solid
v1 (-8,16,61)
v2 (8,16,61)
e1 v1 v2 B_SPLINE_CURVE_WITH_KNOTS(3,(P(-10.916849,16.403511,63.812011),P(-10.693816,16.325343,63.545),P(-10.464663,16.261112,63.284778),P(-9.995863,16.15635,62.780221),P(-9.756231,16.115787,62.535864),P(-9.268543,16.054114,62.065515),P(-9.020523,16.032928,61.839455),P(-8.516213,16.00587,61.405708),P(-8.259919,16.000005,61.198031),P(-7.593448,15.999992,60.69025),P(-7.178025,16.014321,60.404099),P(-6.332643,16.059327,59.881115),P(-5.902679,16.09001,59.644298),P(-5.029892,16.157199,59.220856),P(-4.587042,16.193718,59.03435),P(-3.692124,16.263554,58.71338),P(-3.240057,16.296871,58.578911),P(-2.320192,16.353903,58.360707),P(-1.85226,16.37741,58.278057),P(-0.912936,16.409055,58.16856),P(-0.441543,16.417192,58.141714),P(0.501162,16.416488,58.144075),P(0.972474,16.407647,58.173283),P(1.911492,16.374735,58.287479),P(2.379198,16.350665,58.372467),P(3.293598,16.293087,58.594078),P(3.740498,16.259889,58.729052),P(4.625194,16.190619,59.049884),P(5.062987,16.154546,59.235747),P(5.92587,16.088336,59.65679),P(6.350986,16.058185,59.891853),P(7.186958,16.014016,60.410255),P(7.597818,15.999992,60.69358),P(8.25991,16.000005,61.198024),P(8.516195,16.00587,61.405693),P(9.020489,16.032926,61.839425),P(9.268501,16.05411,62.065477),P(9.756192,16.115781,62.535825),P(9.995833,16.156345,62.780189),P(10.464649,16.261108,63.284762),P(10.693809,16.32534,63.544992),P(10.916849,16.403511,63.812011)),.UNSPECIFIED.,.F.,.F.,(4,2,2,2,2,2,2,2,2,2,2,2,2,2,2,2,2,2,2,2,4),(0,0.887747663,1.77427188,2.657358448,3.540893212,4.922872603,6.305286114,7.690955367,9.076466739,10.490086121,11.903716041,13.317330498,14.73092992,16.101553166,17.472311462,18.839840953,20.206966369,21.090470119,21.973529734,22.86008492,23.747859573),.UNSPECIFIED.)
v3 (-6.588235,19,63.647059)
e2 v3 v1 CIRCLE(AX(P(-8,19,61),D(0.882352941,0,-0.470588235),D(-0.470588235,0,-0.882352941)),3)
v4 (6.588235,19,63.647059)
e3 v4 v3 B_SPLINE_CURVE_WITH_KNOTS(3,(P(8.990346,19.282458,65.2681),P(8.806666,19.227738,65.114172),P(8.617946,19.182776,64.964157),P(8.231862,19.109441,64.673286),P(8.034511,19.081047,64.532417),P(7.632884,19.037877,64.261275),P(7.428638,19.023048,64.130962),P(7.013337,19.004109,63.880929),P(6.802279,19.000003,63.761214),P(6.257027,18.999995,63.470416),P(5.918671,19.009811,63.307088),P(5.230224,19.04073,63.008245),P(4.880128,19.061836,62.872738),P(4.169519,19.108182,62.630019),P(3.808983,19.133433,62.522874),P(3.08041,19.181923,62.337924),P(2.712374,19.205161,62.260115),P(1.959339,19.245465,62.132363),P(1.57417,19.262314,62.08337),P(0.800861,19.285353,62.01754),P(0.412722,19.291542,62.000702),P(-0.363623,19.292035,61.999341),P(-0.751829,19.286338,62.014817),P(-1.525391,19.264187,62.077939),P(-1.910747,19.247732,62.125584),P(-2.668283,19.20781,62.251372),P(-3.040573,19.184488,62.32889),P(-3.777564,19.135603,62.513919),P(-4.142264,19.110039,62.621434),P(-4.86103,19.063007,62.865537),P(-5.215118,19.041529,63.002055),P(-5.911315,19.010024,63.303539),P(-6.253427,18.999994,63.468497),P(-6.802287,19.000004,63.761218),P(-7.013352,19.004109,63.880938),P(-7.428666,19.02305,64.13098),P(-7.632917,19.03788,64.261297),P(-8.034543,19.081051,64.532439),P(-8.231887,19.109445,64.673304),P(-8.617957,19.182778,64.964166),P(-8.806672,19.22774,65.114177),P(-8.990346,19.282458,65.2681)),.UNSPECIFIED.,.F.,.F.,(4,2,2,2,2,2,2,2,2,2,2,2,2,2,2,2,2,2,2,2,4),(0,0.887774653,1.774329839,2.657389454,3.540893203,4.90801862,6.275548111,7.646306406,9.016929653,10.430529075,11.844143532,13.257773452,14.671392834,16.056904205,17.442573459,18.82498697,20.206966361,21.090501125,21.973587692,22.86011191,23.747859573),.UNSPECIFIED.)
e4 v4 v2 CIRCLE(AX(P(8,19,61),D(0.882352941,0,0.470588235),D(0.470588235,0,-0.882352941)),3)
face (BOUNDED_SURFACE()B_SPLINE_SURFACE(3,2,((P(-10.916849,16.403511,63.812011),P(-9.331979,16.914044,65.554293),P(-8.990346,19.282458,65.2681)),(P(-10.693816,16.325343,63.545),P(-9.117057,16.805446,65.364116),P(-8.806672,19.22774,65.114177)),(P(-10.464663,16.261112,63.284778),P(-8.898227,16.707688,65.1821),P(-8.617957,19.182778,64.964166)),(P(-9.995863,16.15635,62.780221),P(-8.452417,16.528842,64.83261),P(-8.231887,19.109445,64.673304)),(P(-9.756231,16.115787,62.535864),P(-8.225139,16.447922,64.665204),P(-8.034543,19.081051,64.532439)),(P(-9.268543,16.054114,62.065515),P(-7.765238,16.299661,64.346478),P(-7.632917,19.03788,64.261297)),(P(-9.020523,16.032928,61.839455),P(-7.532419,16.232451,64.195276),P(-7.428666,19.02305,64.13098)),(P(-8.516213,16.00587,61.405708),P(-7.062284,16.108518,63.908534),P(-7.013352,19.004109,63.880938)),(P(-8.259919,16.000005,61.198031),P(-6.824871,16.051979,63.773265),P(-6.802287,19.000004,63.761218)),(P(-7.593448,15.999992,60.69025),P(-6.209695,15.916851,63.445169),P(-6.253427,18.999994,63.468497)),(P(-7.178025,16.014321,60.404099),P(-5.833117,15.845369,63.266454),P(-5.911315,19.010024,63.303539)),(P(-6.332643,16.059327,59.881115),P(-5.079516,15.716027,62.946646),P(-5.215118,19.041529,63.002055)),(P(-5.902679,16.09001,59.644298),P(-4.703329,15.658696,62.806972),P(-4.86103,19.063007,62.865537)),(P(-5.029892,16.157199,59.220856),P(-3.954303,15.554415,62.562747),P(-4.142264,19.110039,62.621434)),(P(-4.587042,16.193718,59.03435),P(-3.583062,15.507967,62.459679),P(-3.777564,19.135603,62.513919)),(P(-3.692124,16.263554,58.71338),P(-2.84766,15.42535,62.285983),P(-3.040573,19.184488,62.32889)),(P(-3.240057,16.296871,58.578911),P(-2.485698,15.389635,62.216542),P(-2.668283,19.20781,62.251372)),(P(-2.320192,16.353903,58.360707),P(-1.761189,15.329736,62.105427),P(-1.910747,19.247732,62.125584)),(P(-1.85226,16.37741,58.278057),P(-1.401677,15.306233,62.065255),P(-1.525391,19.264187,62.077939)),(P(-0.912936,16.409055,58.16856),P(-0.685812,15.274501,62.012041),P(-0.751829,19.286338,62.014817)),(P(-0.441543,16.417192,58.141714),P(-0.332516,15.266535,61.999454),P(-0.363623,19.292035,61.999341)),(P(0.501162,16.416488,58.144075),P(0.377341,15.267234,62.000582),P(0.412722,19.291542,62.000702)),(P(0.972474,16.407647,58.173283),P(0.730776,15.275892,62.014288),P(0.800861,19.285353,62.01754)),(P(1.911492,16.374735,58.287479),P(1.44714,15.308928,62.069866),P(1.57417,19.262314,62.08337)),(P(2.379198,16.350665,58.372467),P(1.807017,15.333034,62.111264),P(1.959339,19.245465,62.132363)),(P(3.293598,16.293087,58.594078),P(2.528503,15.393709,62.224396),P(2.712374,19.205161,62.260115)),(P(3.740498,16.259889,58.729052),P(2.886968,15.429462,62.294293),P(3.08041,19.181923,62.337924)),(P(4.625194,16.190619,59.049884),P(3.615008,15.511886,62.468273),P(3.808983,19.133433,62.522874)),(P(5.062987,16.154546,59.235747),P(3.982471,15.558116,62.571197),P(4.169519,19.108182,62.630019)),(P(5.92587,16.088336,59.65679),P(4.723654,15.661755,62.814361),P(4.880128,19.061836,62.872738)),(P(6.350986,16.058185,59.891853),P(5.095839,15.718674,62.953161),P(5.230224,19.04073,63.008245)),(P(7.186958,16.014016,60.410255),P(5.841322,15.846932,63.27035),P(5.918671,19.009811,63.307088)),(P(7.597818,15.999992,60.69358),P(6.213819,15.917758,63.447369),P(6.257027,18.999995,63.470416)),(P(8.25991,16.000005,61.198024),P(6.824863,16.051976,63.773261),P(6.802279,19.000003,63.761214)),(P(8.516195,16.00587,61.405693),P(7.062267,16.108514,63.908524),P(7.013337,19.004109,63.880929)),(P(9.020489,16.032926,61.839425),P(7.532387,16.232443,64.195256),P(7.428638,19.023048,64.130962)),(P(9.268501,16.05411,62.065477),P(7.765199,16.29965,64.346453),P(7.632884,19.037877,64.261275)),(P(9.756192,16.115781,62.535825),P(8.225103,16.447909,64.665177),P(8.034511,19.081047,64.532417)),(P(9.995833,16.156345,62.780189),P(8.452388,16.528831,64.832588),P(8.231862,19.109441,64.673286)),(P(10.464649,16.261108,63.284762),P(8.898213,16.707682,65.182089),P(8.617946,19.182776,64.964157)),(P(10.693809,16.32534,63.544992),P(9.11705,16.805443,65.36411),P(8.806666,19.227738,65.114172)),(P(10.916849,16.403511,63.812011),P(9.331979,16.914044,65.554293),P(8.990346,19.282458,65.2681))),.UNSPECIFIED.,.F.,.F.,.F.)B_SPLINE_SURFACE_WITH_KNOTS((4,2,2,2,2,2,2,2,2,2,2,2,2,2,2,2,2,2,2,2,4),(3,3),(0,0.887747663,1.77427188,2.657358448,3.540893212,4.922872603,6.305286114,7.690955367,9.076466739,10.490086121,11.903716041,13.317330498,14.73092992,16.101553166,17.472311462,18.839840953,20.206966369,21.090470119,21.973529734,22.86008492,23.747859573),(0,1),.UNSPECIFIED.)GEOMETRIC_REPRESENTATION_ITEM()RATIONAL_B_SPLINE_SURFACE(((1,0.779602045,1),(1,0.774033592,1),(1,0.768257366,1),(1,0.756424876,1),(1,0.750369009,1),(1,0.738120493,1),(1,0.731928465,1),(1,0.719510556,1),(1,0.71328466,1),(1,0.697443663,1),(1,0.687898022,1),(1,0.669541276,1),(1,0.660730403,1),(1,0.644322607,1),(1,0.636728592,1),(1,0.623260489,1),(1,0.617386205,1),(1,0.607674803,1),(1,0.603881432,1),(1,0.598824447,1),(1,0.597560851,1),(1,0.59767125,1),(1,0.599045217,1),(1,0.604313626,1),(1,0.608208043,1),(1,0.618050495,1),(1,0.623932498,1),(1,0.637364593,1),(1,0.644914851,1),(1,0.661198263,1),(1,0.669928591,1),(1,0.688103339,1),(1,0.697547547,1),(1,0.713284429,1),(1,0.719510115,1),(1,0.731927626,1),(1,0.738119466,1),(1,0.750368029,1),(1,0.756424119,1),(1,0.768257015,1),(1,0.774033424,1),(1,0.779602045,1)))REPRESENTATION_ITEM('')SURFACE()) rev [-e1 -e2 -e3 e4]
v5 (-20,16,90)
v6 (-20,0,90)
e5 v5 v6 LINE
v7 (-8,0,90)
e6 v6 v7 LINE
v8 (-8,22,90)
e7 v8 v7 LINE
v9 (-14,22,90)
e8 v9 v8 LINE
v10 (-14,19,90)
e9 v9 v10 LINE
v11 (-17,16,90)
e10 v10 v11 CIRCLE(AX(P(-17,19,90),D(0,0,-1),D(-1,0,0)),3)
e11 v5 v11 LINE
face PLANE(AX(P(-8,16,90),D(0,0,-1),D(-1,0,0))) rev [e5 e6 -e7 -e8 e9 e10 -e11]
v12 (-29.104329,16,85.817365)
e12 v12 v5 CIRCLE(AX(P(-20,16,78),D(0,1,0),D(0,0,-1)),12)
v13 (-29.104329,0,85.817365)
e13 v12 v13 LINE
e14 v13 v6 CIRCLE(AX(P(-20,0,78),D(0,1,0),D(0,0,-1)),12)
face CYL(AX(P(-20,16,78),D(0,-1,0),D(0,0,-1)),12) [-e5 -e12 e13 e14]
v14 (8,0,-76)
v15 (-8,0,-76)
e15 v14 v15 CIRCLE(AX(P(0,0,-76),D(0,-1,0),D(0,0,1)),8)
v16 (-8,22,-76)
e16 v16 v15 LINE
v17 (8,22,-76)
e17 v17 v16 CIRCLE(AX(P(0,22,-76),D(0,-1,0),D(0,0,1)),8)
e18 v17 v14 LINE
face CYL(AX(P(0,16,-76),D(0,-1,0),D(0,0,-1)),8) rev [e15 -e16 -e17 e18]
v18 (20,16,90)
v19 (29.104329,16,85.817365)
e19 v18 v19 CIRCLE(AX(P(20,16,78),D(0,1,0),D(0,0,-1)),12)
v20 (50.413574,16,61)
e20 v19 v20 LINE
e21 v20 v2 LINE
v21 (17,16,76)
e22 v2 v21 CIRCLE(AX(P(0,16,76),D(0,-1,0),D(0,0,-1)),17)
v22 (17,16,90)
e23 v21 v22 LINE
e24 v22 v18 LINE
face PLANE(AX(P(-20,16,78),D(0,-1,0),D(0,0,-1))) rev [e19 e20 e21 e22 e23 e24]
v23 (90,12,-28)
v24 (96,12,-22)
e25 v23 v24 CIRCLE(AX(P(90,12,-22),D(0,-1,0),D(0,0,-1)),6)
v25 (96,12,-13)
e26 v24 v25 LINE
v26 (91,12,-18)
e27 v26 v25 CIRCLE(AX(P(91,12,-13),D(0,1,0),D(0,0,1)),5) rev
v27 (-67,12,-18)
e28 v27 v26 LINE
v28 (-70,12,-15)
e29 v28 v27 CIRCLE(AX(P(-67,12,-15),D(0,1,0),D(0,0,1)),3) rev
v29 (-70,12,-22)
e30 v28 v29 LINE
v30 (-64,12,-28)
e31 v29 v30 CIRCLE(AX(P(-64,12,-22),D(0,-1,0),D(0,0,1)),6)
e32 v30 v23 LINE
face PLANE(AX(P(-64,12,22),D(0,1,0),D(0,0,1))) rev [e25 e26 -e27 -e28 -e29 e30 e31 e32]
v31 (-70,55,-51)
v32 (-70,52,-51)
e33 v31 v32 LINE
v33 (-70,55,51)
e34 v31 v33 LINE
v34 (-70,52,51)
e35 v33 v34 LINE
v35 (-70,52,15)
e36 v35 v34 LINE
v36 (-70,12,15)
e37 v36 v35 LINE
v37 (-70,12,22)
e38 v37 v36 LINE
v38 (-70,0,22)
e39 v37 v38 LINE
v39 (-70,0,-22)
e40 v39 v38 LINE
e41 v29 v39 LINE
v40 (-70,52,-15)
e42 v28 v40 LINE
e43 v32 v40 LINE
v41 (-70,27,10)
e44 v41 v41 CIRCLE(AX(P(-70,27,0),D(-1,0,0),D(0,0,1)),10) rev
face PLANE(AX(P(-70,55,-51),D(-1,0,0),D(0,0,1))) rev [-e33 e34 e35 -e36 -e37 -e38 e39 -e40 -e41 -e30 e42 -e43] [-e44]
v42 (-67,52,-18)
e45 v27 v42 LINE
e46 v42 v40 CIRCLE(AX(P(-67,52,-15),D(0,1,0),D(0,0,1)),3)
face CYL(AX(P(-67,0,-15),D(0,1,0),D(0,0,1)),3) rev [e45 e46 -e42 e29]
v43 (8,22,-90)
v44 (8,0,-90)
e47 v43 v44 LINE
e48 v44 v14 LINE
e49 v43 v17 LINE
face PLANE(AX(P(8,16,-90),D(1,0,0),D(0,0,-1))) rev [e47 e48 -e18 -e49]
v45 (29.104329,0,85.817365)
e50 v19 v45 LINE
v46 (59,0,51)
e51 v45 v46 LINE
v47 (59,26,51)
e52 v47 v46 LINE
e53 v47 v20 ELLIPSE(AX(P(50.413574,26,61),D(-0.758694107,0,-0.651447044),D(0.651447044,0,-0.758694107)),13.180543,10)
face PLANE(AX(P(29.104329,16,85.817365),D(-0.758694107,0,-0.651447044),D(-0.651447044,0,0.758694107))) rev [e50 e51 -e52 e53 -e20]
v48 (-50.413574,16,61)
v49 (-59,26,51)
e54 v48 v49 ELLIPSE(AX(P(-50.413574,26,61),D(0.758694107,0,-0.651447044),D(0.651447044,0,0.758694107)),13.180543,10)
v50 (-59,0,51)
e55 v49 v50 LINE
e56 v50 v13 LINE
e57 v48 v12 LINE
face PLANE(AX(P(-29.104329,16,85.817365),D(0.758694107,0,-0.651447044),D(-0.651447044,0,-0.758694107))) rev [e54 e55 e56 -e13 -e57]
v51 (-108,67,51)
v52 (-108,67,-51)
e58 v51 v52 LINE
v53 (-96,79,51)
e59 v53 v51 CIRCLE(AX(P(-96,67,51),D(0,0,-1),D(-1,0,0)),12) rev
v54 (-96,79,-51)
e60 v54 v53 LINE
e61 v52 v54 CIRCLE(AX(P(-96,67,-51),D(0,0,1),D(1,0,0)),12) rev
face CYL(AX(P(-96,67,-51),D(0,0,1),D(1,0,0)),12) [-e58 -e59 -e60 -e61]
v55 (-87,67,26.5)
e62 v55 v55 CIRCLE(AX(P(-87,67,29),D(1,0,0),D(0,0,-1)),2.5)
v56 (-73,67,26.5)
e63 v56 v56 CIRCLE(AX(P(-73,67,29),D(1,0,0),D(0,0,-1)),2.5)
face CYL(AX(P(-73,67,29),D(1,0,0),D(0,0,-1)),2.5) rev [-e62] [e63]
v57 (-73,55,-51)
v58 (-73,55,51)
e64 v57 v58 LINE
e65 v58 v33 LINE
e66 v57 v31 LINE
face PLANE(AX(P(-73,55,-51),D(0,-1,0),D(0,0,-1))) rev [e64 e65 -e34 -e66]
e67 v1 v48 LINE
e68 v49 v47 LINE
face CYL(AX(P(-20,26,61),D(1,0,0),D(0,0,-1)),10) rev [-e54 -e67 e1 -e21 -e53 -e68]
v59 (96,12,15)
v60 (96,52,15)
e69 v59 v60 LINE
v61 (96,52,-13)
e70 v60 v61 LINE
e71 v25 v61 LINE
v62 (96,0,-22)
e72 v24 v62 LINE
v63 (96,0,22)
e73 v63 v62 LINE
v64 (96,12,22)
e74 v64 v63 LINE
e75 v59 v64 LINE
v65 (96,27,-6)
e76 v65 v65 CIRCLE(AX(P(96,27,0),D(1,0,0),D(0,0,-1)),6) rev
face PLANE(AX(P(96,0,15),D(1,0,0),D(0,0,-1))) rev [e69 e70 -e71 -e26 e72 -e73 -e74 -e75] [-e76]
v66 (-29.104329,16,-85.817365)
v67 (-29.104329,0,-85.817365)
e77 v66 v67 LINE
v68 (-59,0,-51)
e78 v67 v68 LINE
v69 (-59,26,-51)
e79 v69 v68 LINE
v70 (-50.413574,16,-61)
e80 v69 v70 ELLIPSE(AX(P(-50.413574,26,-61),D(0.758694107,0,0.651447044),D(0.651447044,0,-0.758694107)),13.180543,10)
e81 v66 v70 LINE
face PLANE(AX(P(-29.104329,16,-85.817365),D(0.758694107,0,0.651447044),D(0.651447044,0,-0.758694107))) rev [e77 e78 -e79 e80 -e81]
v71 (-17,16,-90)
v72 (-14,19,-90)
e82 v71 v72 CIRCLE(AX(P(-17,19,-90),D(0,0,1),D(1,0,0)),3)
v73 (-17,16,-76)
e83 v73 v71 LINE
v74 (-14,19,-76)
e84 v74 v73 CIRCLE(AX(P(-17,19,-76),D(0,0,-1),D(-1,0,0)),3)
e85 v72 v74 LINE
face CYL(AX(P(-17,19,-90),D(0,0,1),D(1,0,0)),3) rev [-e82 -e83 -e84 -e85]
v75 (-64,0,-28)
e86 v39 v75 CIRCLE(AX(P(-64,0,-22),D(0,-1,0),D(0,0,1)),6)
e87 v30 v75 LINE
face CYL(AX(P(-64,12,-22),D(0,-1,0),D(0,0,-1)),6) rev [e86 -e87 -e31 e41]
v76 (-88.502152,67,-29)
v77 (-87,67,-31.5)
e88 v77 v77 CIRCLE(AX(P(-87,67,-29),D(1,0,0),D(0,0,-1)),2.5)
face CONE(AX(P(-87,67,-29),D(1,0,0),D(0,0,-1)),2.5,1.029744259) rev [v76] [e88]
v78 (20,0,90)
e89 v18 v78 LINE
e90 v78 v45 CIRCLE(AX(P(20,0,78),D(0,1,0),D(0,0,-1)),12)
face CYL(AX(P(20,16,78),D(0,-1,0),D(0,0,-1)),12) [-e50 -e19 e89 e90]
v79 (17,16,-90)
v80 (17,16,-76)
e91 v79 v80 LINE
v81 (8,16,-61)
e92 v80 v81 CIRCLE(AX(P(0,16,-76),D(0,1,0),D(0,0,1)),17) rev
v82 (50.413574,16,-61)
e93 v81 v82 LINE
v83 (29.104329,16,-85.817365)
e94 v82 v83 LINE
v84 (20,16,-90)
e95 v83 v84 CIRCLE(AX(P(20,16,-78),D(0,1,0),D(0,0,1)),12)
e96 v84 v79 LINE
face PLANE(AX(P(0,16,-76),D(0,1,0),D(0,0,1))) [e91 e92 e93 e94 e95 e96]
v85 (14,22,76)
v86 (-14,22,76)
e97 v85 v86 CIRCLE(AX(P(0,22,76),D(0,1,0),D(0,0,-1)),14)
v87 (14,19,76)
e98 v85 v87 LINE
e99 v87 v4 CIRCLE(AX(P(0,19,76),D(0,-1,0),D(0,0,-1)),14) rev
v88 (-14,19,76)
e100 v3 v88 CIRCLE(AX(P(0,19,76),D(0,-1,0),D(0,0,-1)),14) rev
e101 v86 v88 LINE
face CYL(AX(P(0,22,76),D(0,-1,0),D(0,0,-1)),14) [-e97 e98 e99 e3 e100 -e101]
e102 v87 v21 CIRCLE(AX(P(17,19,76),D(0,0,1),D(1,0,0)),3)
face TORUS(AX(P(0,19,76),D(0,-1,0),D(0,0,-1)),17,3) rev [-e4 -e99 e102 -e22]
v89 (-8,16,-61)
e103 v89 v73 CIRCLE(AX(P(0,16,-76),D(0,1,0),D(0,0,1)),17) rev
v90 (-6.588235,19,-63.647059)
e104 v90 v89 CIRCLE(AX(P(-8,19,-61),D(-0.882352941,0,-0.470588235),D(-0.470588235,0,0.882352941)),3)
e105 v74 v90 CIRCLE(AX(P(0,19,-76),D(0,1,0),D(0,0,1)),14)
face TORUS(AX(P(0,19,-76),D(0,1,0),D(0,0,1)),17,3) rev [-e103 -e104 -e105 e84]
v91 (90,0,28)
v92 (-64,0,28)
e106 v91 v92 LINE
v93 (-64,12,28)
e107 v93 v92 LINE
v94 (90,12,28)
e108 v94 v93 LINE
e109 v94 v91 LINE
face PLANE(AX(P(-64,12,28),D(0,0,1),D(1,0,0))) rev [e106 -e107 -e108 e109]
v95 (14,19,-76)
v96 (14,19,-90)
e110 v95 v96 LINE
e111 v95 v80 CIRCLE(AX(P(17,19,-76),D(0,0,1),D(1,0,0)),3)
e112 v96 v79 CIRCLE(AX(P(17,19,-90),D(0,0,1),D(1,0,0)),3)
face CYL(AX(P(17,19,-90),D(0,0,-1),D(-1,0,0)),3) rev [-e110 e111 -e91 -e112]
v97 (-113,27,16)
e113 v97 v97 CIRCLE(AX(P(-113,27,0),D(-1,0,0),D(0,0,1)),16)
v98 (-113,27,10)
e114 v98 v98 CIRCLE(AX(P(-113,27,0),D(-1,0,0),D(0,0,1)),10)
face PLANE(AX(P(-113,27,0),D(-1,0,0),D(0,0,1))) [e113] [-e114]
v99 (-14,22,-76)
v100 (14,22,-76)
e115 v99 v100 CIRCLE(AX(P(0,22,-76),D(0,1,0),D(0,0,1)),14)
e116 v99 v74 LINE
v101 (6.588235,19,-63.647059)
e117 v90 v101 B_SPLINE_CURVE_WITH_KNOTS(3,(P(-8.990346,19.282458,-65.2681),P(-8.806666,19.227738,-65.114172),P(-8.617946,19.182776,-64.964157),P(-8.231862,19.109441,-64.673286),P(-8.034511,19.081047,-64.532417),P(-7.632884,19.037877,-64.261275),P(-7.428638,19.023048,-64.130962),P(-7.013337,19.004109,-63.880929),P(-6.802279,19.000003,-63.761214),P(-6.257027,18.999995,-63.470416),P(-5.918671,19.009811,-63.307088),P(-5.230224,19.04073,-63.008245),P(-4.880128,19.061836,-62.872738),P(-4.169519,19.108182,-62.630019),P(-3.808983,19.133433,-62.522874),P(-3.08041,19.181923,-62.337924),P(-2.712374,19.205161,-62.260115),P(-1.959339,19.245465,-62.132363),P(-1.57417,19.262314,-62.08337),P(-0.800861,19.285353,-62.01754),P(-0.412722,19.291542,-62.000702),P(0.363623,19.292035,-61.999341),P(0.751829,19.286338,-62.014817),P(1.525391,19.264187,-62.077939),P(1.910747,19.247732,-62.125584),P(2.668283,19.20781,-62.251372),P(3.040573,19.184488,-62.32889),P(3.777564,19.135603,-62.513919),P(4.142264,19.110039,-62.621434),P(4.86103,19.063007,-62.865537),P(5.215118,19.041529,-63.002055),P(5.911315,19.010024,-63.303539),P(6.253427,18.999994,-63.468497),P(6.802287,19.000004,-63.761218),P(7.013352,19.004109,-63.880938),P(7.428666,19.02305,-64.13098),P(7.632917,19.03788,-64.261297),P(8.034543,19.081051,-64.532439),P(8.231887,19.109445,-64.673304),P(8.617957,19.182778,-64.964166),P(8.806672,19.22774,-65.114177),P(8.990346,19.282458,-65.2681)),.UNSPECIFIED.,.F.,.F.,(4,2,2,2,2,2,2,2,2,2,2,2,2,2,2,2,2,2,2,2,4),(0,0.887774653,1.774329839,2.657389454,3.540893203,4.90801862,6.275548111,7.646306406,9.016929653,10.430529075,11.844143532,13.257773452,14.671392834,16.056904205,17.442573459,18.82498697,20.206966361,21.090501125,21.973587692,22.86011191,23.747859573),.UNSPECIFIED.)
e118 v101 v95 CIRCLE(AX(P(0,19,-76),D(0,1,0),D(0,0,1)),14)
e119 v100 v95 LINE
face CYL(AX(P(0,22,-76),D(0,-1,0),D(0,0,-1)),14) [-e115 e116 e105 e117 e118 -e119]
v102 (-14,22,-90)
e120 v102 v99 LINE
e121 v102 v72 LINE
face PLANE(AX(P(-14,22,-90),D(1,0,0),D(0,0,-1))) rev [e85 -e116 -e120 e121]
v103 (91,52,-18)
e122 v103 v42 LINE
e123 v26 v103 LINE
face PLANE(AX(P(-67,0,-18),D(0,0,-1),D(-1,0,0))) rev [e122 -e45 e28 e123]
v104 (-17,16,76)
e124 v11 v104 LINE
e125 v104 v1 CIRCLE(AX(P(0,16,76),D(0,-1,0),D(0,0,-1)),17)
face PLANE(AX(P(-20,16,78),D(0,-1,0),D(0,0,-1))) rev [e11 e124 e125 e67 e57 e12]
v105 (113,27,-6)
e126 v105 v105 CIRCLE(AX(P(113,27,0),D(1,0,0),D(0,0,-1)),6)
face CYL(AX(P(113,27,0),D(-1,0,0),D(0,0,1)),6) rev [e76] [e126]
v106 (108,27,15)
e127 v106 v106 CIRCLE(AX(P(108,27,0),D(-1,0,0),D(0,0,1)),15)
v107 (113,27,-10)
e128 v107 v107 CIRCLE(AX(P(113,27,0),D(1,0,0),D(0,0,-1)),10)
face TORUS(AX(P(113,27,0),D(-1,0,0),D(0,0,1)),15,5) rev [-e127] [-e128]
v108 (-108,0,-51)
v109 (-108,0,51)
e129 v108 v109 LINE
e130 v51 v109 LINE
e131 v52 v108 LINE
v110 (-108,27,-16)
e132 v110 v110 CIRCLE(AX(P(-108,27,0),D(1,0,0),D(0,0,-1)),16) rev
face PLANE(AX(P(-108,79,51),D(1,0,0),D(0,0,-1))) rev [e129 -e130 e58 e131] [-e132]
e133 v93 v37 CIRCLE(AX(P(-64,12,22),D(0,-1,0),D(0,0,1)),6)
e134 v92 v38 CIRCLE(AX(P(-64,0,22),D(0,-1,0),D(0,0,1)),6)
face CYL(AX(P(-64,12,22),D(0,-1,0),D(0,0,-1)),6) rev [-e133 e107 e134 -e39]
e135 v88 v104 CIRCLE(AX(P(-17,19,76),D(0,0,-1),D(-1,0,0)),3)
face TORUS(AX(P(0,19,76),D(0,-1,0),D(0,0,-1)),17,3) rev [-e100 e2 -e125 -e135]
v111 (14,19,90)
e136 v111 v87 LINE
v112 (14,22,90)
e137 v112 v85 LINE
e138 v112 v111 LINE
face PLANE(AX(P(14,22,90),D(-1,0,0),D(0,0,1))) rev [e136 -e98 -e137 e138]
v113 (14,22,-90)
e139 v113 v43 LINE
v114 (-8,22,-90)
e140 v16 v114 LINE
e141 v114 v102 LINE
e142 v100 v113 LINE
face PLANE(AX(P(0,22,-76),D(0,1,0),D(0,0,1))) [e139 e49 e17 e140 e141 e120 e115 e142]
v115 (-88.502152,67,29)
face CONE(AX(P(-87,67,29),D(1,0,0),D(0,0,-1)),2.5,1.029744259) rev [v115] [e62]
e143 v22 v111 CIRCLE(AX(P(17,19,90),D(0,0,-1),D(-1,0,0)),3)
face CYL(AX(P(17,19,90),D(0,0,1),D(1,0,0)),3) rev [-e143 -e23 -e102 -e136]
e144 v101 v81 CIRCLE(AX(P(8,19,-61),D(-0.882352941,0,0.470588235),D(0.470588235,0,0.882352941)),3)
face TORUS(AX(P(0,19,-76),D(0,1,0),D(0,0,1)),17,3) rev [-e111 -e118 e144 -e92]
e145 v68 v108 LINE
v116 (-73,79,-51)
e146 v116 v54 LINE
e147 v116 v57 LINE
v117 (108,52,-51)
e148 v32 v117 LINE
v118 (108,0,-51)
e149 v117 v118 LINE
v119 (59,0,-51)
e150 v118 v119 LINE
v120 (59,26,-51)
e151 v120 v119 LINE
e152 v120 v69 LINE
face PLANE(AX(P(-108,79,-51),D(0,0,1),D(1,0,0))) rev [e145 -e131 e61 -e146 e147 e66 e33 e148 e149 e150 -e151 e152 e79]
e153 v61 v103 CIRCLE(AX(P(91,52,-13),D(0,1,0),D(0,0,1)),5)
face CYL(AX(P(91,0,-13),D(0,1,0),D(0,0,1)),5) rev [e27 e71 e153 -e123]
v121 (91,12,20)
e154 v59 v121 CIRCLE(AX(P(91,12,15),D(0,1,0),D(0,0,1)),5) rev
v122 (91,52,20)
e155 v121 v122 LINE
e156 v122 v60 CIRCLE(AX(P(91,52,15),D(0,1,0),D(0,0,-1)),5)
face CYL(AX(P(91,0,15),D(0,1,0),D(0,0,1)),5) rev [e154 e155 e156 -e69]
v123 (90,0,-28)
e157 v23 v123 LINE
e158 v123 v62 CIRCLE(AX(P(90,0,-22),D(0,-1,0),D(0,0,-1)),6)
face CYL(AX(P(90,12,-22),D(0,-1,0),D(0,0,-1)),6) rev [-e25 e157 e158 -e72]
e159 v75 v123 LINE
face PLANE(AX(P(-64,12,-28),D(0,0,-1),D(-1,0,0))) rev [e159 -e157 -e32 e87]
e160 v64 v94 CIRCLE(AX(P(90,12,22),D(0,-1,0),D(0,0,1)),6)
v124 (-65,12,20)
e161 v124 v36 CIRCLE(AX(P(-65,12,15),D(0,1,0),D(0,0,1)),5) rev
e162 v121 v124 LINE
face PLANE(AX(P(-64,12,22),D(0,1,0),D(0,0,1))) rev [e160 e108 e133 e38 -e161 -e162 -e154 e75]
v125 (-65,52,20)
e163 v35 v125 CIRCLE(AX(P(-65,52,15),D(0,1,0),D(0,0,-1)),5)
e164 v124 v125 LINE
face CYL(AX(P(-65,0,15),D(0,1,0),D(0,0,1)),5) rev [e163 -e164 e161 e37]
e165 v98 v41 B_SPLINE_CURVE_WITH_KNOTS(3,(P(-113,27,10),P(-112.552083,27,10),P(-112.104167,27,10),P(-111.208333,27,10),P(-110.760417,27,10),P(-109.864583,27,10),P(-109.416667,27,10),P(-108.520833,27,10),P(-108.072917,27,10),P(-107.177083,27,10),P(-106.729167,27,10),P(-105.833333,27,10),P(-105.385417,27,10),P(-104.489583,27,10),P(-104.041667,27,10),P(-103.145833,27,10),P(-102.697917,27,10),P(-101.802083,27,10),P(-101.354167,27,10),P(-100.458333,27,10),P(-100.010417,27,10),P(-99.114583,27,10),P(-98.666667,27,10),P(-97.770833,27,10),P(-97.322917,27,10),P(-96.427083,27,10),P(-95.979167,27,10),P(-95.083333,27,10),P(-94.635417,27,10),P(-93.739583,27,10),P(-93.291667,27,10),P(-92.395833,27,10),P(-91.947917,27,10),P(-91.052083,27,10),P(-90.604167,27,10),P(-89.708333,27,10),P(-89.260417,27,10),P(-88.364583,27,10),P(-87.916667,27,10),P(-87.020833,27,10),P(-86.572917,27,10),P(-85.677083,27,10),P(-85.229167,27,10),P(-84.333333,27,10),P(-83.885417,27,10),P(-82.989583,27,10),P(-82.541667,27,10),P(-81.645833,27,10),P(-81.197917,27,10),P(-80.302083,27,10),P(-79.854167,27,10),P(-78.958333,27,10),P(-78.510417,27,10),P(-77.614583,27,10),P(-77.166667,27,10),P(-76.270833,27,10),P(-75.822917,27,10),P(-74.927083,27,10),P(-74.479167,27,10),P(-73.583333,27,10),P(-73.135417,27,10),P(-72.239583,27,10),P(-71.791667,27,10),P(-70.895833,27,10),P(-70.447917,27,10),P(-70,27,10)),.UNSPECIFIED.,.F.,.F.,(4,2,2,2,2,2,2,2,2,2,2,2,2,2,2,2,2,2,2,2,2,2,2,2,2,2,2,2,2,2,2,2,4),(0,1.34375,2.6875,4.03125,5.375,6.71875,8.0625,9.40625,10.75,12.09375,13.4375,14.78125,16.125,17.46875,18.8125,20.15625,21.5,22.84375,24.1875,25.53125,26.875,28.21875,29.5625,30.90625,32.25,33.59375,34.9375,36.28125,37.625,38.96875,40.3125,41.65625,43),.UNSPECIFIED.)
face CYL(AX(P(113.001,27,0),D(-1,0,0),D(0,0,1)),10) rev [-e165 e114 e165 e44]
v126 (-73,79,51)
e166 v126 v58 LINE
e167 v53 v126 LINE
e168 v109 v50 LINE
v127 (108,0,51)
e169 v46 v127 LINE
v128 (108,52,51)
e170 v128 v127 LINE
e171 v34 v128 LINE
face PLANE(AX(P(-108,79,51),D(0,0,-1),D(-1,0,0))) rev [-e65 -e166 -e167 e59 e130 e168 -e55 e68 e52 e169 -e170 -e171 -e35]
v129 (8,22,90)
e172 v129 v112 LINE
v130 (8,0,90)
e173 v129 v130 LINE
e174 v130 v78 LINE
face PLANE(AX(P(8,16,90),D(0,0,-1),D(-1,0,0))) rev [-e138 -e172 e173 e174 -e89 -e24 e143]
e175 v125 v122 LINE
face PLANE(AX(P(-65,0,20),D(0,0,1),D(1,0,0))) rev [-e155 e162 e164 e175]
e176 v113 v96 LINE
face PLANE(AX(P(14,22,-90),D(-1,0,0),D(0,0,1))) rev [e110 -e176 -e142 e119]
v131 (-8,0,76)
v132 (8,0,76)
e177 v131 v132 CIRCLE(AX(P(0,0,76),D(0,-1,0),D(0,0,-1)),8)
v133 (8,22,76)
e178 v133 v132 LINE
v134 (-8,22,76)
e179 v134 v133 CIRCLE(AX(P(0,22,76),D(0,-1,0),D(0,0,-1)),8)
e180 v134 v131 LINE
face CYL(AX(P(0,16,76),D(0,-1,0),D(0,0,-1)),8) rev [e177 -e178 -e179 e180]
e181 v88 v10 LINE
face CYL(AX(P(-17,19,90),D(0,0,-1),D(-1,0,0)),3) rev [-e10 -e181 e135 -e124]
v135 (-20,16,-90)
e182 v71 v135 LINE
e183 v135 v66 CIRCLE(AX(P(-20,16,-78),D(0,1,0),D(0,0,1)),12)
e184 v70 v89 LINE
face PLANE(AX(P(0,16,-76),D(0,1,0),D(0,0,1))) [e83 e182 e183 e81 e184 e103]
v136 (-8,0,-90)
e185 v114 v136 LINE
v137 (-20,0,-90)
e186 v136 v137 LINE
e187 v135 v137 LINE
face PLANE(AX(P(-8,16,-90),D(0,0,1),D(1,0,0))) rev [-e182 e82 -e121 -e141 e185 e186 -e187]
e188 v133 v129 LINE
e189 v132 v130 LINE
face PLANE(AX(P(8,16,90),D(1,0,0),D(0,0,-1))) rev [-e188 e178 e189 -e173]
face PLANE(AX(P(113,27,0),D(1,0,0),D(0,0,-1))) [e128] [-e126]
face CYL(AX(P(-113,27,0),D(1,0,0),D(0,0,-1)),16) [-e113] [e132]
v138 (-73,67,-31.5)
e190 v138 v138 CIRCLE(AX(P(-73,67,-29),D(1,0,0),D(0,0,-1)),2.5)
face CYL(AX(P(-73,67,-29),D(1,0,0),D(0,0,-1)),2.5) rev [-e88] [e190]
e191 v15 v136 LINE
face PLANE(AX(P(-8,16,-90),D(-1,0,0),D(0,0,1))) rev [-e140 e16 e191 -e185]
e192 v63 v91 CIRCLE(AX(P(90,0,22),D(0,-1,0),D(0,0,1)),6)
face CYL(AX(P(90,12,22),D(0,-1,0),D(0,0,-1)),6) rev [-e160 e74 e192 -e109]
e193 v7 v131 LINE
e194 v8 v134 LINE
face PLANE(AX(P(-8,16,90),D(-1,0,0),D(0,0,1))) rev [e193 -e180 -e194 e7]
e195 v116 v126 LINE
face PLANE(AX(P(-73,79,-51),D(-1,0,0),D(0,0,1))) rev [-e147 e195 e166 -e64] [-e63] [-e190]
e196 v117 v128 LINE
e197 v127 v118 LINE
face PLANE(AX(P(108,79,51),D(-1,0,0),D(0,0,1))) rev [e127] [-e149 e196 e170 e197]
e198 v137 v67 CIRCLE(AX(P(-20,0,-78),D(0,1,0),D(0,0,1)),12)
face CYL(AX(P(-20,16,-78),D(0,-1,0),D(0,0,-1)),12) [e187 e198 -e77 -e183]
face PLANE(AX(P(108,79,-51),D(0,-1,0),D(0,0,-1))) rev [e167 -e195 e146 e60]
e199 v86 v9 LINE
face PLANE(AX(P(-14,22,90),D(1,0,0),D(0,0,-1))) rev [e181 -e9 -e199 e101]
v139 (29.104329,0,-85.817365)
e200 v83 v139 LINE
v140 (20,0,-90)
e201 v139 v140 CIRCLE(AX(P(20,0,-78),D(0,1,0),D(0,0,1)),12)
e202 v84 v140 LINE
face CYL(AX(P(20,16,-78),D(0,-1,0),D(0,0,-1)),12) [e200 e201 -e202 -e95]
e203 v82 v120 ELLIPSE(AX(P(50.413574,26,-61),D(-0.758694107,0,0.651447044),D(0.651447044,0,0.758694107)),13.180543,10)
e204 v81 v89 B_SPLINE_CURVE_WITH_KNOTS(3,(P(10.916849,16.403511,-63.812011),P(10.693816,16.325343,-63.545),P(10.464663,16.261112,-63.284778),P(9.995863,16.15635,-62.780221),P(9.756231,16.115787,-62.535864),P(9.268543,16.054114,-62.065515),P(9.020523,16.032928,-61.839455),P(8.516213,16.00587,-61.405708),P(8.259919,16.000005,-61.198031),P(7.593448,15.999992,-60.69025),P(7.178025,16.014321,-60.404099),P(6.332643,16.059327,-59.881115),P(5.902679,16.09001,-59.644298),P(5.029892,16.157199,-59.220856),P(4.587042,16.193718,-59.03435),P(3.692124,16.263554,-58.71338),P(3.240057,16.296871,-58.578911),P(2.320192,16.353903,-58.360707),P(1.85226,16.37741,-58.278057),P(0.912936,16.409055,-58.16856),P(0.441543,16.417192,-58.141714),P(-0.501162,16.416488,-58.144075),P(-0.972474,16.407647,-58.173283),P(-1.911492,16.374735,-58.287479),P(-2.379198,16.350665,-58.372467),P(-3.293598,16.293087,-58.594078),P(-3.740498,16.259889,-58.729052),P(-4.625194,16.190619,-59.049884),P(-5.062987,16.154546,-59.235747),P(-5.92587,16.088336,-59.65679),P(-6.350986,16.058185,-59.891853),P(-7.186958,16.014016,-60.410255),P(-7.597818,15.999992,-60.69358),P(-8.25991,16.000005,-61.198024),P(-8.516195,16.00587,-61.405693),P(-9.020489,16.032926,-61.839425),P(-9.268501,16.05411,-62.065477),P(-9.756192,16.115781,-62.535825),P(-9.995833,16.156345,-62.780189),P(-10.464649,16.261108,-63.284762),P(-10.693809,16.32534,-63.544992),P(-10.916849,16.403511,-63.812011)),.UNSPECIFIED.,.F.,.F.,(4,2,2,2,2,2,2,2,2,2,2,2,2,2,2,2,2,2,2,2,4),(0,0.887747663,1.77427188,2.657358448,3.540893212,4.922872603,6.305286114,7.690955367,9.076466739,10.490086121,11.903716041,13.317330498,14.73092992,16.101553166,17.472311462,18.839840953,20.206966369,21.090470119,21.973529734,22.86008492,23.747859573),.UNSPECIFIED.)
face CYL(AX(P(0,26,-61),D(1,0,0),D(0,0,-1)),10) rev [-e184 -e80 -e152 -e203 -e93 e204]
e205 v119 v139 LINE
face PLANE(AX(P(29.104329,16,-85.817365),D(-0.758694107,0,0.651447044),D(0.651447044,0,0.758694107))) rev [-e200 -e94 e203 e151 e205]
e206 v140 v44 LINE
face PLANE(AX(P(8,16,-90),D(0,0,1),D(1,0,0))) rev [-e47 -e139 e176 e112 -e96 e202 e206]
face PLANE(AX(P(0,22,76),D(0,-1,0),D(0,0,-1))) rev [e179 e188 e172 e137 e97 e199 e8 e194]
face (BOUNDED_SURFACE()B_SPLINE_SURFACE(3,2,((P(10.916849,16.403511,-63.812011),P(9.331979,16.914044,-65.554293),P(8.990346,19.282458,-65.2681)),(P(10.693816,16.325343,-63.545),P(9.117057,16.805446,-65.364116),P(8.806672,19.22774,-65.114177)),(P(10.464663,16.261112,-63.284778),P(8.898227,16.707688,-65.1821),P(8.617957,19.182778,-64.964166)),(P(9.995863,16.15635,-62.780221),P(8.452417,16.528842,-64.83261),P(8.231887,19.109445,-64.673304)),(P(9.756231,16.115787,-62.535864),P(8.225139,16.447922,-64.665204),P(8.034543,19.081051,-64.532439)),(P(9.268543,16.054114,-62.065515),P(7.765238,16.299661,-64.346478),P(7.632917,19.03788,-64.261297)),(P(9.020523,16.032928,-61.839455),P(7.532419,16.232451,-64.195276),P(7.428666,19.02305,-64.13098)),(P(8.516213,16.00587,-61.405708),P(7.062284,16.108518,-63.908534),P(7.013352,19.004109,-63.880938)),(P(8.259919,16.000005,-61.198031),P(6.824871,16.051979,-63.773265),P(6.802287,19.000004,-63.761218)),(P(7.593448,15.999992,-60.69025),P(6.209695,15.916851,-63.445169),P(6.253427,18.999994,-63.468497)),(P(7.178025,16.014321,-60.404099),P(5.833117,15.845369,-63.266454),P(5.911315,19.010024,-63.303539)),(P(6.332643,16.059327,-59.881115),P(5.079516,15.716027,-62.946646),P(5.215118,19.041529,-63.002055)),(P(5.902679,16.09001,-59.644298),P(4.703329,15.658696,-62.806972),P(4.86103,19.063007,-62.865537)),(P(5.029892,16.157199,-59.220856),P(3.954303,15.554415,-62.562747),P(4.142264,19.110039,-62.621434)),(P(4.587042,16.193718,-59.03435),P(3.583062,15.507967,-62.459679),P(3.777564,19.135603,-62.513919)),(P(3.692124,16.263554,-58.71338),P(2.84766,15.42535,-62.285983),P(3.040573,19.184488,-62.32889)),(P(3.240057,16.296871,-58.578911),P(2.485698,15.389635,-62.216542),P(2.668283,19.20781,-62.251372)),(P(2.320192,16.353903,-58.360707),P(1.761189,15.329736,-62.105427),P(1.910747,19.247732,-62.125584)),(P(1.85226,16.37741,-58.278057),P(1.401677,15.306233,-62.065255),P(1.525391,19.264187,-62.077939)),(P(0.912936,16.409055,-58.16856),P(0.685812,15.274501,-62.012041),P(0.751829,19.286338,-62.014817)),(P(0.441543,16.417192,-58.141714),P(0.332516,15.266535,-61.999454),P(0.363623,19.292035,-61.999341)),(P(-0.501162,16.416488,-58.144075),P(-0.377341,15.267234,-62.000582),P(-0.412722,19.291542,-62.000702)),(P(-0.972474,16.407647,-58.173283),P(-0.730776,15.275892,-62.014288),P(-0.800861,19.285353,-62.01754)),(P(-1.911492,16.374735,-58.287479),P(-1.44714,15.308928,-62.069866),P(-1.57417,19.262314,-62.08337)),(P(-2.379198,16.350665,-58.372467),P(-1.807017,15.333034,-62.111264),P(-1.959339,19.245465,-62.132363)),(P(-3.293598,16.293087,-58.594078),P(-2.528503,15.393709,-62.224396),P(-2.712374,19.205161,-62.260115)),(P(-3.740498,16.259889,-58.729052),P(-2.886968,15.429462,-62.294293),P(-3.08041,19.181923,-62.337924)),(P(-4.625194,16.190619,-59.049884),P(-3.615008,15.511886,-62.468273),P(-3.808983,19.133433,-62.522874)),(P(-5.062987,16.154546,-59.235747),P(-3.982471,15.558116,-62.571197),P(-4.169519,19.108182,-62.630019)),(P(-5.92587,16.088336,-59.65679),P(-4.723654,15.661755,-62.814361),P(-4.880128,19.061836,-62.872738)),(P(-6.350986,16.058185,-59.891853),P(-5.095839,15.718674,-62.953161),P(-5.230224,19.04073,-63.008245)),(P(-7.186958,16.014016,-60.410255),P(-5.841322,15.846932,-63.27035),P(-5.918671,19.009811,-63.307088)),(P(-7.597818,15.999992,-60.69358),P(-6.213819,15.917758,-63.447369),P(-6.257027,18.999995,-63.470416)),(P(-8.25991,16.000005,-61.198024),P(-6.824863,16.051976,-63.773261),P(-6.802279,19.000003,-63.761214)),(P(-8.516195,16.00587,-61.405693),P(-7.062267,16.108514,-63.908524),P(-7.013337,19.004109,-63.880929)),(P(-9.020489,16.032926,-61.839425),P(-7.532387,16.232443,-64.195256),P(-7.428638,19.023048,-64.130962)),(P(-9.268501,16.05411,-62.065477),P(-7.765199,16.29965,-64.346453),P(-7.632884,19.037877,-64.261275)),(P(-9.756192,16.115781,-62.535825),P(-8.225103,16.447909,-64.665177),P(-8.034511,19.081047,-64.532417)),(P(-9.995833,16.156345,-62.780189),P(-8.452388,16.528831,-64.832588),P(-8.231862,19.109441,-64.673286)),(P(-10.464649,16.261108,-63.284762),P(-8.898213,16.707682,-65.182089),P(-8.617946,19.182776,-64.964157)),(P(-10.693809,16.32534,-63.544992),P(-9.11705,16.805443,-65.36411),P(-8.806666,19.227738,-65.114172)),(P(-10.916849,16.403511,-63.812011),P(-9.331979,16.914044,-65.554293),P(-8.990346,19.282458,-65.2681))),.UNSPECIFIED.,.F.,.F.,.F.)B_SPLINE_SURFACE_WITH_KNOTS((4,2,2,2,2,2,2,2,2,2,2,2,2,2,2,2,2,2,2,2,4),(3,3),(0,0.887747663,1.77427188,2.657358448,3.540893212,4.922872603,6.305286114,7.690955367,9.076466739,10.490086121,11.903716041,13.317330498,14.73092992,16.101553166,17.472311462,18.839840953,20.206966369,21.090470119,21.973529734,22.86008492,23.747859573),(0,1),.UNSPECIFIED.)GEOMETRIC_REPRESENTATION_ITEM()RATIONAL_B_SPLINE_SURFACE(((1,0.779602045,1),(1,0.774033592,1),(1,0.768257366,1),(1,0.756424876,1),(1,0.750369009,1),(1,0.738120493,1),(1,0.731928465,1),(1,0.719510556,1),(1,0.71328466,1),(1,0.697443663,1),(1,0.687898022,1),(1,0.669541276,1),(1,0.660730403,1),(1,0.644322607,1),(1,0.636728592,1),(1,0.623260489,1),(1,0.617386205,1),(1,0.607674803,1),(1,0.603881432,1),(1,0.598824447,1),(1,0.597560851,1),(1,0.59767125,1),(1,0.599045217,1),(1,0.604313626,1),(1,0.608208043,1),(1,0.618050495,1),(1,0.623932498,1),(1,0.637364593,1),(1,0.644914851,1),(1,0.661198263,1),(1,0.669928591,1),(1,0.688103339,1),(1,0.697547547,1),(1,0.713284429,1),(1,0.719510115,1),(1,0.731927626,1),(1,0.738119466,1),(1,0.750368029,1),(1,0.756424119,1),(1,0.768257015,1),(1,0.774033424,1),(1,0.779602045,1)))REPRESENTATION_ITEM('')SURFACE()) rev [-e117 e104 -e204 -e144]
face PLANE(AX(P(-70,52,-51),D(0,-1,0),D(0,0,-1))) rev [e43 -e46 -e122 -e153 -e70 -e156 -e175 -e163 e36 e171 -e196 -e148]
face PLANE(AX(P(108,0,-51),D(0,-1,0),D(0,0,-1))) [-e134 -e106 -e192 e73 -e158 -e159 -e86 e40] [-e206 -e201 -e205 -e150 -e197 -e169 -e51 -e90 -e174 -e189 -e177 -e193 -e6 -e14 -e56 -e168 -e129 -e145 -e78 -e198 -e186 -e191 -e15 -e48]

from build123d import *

# Parameters (mm, degrees)
SKETCH1_W             = 216
SKETCH1_H             = 102
EXTRUDE1_DEPTH        = 79
EXTRUDE2_DEPTH        = 169.25278601
FILLET1_R             = 12
EXTRUDE3_DEPTH        = 131.265114286
EXTRUDE4_DEPTH        = 16
EXTRUDE5_DEPTH        = 6
FILLET3_R             = 10
FILLET4_R             = 3
FILLET5_R             = 10
FILLET6_R             = 3
M6_TAPPED_HOLE1_D     = 5
M6_TAPPED_HOLE1_DEPTH = 14
M6_TAPPED_HOLE1_TIP   = 1.502151548
SKETCH13_R            = 10
SKETCH13_R_2          = 6
EXTRUDE7_DEPTH        = 5
EXTRUDE8_REACH        = 248.976
SKETCH14_R            = 6
FILLET7_R             = 5
SKETCH15_R            = 16
EXTRUDE9_DEPTH        = 5
EXTRUDE10_REACH       = 257.767
SKETCH16_R            = 10
EXTRUDE11_DEPTH       = 12


with BuildPart() as part:
    # Sketch1 → Extrude1 (new body)
    with BuildSketch(Plane(origin=(0, 0, 0), x_dir=(1, 0, 0), z_dir=(0, 1, 0))):
        Rectangle(SKETCH1_W, SKETCH1_H)
    extrude(amount=EXTRUDE1_DEPTH)

    # Sketch2 → Extrude2 (cut, through all)
    with BuildSketch(Plane.XY.offset(51)):
        Polygon((-73, 79), (-73, 55), (-70, 55), (-70, 52), (108, 52), (108, 79), align=None)
    extrude(amount=-EXTRUDE2_DEPTH, mode=Mode.SUBTRACT)

    # Fillet1
    fillet1_edges = [part.edges().sort_by_distance(p)[0] for p in [
        (-108, 79, 0),
    ]]
    fillet(fillet1_edges, radius=FILLET1_R)

    # Sketch3 → Extrude3 (cut, through all)
    with BuildSketch(Plane(origin=(0, 52, 0), x_dir=(1, 0, 0), z_dir=(0, 1, 0))):
        with BuildLine():
            Line((-65, -20), (91, -20))
            ThreePointArc((91, -20), (94.535533906, -18.535533906), (96, -15))
            Line((96, -15), (96, 13))
            ThreePointArc((96, 13), (94.535533906, 16.535533906), (91, 18))
            Line((91, 18), (-67, 18))
            ThreePointArc((-67, 18), (-69.121320344, 17.121320344), (-70, 15))
            Line((-70, 15), (-70, -15))
            ThreePointArc((-70, -15), (-68.535533906, -18.535533906), (-65, -20))
        make_face()
    extrude(amount=-EXTRUDE3_DEPTH, mode=Mode.SUBTRACT)

    # Sketch4 → Extrude4 (add)
    with BuildSketch(Plane(origin=(0, 0, 0), x_dir=(1, 0, 0), z_dir=(0, 1, 0))):
        with BuildLine():
            Line((-8, 90), (-20, 90))
            ThreePointArc((-20, 90), (-25.00957212, 88.904319657), (-29.10432929, 85.817364529))
            Line((-29.10432929, 85.817364529), (-59, 51))
            Line((-59, 51), (59, 51))
            Line((59, 51), (29.10432929, 85.817364529))
            ThreePointArc((29.10432929, 85.817364529), (25.00957212, 88.904319657), (20, 90))
            Line((20, 90), (8, 90))
            Line((8, 90), (8, 76))
            ThreePointArc((8, 76), (0, 68), (-8, 76))
            Line((-8, 76), (-8, 90))
        make_face()
        with BuildLine():
            Line((8, -90), (8, -76))
            ThreePointArc((8, -76), (0, -68), (-8, -76))
            Line((-8, -76), (-8, -90))
            Line((-8, -90), (-20, -90))
            ThreePointArc((-20, -90), (-25.00957212, -88.904319657), (-29.10432929, -85.817364529))
            Line((-29.10432929, -85.817364529), (-59, -51))
            Line((-59, -51), (59, -51))
            Line((59, -51), (29.10432929, -85.817364529))
            ThreePointArc((29.10432929, -85.817364529), (25.00957212, -88.904319657), (20, -90))
            Line((20, -90), (8, -90))
        make_face()
    extrude(amount=EXTRUDE4_DEPTH)

    # Sketch5 → Extrude5 (add)
    with BuildSketch(Plane(origin=(0, 16, 0), x_dir=(1, 0, 0), z_dir=(0, 1, 0))):
        with BuildLine():
            Line((-14, -90), (-14, -76))
            ThreePointArc((-14, -76), (0, -62), (14, -76))
            Line((14, -76), (14, -90))
            Line((14, -90), (8, -90))
            Line((8, -90), (8, -76))
            ThreePointArc((8, -76), (0, -68), (-8, -76))
            Line((-8, -76), (-8, -90))
            Line((-8, -90), (-14, -90))
        make_face()
        with BuildLine():
            Line((14, 90), (14, 76))
            ThreePointArc((14, 76), (0, 62), (-14, 76))
            Line((-14, 76), (-14, 90))
            Line((-14, 90), (-8, 90))
            Line((-8, 90), (-8, 76))
            ThreePointArc((-8, 76), (0, 68), (8, 76))
            Line((8, 76), (8, 90))
            Line((8, 90), (14, 90))
        make_face()
    extrude(amount=EXTRUDE5_DEPTH)

    # Fillet3
    fillet3_edges = [part.edges().sort_by_distance(p)[0] for p in [
        (0, 16, 51),
    ]]
    fillet(fillet3_edges, radius=FILLET3_R)

    # Fillet4
    fillet4_edges = [part.edges().sort_by_distance(p)[0] for p in [
        (14, 16, 83),
        (0, 16, 62),
        (-14, 16, 83),
    ]]
    fillet(fillet4_edges, radius=FILLET4_R)

    # Fillet5
    fillet5_edges = [part.edges().sort_by_distance(p)[0] for p in [
        (0, 16, -51),
    ]]
    fillet(fillet5_edges, radius=FILLET5_R)

    # Fillet6
    fillet6_edges = [part.edges().sort_by_distance(p)[0] for p in [
        (0, 16, -62),
        (14, 16, -83),
        (-14, 16, -83),
    ]]
    fillet(fillet6_edges, radius=FILLET6_R)

    # M6 Tapped Hole1
    with Locations(Plane(origin=(-73, 67, 29), x_dir=(0, 0, 1), z_dir=(1, 0, 0))):
        with Locations((0, 0), (-58, 0)):
            Hole(M6_TAPPED_HOLE1_D / 2, depth=M6_TAPPED_HOLE1_DEPTH)
            with Locations((0, 0, -(M6_TAPPED_HOLE1_DEPTH + M6_TAPPED_HOLE1_TIP / 2))):  # 118° drill point
                Cone(0, M6_TAPPED_HOLE1_D / 2, M6_TAPPED_HOLE1_TIP, mode=Mode.SUBTRACT)

    # Sketch13 → Extrude7 (add)
    with BuildSketch(Plane(origin=(108, 0, 0), x_dir=(0, 0, -1), z_dir=(1, 0, 0))):
        with Locations(Location((0, 27, 0), (0, 0, 180))):
            Circle(SKETCH13_R)
        with Locations((0, 27)):
            Circle(SKETCH13_R_2, mode=Mode.SUBTRACT)
    extrude(amount=EXTRUDE7_DEPTH)

    # Sketch14 → Extrude8 (cut, up to next)
    with BuildSketch(Plane(origin=(108, 0, 0), x_dir=(0, 0, -1), z_dir=(1, 0, 0)), mode=Mode.PRIVATE) as extrude8_sk1:
        with Locations((0, 27)):
            Circle(SKETCH14_R)
    extrude8_tool1 = extrude(extrude8_sk1.sketch, amount=-EXTRUDE8_REACH, mode=Mode.PRIVATE) & part.part
    add(extrude8_tool1.solids().sort_by_distance((108, 27, 0))[0], mode=Mode.SUBTRACT)

    # Fillet7
    fillet7_edges = [part.edges().sort_by_distance(p)[0] for p in [
        (108, 27, -10),
    ]]
    fillet(fillet7_edges, radius=FILLET7_R - 0.0001)  # a hair under: the kernel refuses the full size

    # Sketch15 → Extrude9 (add)
    with BuildSketch(Plane.ZY.offset(108)):
        with Locations(Location((0, 27, 0), (0, 0, 180))):
            Circle(SKETCH15_R)
    extrude(amount=EXTRUDE9_DEPTH)

    # Sketch16 → Extrude10 (cut, up to next)
    with BuildSketch(Plane.ZY.offset(113), mode=Mode.PRIVATE) as extrude10_sk1:
        with Locations((0, 27)):
            Circle(SKETCH16_R)
    extrude10_tool1 = extrude(extrude10_sk1.sketch, amount=-EXTRUDE10_REACH, mode=Mode.PRIVATE) & part.part
    add(extrude10_tool1.solids().sort_by_distance((-113, 27, 0))[0], mode=Mode.SUBTRACT)

    # Sketch17 → Extrude11 (cut)
    with BuildSketch(Plane.XZ):
        with BuildLine():
            Line((-64, -28), (90, -28))
            ThreePointArc((90, -28), (94.242640687, -26.242640687), (96, -22))
            Line((96, -22), (96, 22))
            ThreePointArc((96, 22), (94.242640687, 26.242640687), (90, 28))
            Line((90, 28), (-64, 28))
            ThreePointArc((-64, 28), (-68.242640687, 26.242640687), (-70, 22))
            Line((-70, 22), (-70, -22))
            ThreePointArc((-70, -22), (-68.242640687, -26.242640687), (-64, -28))
        make_face()
    extrude(amount=-EXTRUDE11_DEPTH, mode=Mode.SUBTRACT)


solid = part.part
